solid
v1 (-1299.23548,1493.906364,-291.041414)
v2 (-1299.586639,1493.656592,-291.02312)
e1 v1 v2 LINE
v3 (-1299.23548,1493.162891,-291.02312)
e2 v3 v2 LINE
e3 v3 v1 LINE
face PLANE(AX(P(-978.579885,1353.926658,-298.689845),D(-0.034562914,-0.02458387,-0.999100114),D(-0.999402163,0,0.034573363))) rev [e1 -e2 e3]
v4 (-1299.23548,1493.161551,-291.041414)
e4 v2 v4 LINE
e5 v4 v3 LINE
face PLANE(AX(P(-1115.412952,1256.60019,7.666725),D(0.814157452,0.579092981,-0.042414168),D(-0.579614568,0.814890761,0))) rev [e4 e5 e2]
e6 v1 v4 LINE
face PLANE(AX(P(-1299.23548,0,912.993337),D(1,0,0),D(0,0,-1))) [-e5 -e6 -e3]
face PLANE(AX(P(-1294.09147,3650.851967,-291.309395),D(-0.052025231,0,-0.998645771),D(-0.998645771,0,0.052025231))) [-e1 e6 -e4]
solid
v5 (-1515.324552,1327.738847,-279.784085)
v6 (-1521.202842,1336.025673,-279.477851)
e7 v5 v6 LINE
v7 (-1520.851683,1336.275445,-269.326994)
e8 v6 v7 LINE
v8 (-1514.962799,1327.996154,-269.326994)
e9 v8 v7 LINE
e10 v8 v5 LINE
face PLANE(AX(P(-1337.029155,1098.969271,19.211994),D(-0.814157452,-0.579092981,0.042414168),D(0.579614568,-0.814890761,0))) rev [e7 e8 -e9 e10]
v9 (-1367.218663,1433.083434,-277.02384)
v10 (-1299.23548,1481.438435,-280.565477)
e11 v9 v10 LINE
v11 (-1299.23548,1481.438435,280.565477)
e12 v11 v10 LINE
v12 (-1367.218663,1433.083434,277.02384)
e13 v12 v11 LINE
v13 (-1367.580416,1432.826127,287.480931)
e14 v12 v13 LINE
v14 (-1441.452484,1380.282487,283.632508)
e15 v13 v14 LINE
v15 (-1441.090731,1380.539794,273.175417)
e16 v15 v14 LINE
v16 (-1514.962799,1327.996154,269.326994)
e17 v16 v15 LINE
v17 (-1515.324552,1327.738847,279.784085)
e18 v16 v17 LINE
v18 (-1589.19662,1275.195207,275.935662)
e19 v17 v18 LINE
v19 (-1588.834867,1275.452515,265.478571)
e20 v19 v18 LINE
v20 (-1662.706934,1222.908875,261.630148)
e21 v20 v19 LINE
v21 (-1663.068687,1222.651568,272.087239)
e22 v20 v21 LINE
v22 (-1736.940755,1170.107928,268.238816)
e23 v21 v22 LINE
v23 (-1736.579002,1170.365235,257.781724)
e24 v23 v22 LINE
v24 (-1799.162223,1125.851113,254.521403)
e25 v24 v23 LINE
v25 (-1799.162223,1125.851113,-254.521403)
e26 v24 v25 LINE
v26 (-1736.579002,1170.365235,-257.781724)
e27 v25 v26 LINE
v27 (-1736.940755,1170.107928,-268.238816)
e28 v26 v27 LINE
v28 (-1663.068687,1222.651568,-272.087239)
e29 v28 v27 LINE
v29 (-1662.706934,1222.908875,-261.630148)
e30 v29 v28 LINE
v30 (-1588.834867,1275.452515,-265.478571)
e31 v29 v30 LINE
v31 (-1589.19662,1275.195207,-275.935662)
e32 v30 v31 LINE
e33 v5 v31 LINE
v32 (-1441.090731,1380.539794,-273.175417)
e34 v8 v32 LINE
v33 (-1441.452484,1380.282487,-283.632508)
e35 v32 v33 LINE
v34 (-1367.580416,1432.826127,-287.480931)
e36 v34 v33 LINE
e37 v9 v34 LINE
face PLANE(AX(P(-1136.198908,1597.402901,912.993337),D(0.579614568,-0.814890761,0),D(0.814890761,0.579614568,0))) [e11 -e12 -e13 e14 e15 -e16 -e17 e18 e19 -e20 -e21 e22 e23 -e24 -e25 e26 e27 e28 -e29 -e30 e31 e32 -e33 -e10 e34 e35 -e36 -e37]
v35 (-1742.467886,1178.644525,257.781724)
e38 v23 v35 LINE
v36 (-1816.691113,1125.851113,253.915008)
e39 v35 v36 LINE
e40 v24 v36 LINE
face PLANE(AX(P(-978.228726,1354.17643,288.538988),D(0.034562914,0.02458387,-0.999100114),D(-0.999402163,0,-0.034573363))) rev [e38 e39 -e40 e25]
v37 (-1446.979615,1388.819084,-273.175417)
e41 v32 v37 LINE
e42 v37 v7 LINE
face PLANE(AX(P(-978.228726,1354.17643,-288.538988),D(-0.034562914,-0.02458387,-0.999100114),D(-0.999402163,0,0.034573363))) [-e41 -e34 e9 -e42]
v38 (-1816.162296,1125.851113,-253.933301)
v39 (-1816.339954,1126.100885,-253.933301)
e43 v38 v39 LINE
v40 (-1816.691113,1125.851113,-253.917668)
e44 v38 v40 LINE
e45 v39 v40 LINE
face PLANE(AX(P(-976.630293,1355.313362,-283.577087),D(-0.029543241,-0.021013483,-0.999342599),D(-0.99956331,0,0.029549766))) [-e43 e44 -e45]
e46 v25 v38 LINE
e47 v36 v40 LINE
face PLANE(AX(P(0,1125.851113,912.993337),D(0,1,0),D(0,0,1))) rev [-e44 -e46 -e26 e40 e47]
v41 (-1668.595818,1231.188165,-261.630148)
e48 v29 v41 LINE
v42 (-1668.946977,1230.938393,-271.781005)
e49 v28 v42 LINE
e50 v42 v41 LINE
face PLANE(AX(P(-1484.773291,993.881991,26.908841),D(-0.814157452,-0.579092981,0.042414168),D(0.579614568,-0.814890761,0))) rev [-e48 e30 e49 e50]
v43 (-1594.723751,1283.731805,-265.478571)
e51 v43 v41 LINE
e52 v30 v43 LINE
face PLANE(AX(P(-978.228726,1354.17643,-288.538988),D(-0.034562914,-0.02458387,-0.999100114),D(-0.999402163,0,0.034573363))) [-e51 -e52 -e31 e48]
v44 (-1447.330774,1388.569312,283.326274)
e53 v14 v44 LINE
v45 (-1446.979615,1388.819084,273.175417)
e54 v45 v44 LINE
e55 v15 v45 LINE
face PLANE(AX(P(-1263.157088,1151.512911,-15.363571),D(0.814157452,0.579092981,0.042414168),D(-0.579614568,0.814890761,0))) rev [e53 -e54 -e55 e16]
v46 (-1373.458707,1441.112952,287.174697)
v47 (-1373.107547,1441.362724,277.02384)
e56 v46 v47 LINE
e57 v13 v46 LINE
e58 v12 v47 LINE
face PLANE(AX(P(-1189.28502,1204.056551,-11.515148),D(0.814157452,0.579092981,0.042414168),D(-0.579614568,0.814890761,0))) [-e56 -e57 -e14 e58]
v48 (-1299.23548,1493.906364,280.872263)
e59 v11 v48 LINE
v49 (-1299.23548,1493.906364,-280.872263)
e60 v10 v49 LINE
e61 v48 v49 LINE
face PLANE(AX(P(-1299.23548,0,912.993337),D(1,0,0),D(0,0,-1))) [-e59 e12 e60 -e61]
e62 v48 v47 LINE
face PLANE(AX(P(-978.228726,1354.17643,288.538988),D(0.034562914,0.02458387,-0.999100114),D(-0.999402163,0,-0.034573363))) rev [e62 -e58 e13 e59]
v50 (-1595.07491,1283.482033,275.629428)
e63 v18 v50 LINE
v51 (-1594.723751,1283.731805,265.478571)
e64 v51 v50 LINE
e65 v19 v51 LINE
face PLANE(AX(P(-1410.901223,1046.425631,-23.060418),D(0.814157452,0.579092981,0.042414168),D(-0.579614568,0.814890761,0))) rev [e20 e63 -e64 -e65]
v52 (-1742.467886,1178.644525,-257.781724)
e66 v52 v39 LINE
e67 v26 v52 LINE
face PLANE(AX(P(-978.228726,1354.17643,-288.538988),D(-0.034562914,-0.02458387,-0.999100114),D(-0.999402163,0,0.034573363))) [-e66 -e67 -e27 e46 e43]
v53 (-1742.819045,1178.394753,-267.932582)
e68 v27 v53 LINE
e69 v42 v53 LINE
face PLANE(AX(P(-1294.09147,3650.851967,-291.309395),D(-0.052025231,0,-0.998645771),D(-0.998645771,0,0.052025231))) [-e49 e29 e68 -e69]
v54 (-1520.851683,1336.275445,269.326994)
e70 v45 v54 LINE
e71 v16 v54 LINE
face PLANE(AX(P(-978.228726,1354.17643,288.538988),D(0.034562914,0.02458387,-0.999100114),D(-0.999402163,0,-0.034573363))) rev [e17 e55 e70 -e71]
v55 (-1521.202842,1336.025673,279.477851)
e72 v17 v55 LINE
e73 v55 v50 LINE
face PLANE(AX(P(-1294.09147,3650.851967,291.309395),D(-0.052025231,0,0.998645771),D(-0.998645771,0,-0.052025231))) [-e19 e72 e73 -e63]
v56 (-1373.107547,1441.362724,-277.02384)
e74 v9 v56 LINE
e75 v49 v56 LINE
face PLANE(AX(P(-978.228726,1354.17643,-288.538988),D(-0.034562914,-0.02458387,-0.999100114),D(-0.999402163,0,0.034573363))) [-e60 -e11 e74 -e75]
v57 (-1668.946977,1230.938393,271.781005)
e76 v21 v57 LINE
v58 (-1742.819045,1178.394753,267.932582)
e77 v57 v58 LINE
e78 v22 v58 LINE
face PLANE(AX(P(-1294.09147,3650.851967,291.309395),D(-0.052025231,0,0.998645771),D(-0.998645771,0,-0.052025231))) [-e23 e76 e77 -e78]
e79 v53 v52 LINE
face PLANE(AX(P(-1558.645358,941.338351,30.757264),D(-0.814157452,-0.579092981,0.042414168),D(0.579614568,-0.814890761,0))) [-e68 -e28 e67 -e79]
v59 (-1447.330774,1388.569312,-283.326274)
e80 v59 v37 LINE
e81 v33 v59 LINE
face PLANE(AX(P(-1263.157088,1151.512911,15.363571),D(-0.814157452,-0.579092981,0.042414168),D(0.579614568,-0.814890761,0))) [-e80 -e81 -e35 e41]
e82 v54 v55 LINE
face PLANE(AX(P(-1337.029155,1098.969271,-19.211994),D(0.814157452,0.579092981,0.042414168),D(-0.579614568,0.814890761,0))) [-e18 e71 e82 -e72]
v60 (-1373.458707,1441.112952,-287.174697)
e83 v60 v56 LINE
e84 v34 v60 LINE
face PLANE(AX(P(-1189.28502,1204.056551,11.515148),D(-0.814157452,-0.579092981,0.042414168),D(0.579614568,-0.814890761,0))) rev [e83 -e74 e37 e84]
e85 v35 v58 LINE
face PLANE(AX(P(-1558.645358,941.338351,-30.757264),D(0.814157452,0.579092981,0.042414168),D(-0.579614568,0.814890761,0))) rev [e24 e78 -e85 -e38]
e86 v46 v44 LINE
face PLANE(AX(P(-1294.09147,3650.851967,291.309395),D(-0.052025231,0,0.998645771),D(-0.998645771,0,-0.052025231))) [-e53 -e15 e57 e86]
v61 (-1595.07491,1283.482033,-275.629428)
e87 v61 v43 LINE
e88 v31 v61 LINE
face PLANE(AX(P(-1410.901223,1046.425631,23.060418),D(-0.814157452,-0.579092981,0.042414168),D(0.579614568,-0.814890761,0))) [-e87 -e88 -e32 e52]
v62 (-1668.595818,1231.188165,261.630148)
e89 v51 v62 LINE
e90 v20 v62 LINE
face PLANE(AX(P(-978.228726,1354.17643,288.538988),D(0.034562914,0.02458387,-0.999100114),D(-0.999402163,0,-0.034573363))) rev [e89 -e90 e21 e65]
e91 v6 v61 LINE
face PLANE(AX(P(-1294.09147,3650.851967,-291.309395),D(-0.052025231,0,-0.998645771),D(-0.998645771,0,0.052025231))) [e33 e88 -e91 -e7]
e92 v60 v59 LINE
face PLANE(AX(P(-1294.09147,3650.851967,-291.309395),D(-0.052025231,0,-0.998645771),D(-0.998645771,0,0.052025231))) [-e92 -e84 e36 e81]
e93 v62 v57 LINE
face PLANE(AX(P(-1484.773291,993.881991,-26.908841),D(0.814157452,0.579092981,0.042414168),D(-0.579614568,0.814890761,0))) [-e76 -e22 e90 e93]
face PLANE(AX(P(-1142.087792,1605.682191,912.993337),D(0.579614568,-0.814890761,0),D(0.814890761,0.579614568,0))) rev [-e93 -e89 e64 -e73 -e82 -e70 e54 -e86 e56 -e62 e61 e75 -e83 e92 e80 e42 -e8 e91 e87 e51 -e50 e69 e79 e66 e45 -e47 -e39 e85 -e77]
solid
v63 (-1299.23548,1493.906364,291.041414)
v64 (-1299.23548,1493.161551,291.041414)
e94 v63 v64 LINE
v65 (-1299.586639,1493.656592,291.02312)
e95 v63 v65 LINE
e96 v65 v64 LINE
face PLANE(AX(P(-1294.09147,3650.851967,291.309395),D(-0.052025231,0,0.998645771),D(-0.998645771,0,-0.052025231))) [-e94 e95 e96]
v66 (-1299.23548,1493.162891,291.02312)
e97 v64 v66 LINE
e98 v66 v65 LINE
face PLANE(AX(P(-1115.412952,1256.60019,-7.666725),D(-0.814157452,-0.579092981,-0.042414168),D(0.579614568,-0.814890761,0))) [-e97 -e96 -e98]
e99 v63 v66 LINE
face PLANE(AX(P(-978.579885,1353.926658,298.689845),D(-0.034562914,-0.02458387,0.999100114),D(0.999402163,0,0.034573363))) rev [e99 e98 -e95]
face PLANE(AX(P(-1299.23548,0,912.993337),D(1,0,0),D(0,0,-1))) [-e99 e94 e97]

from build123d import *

# Parameters (mm, degrees)
CUT_EXTRUDE1_DEPTH = 878.515019104


with BuildPart() as part:
    # Boss-Extrude1: read off the stored shape, not the designer's step
    # Boss-Extrude1: loft between two sections, ruled curve by curve
    boss_extrude1_from = [
        Edge.make_line((-1299.235479685, 1493.906364056, 291.041413739), (-1816.691112906, 1125.851113248, 264.08415862)),
        Edge.make_line((-1816.691112906, 1125.851113248, 264.08415862), (-1816.691112906, 1125.851113248, -264.08415862)),
        Edge.make_line((-1299.235479685, 1493.906364056, 291.041413739), (-1299.235479685, 1493.906364056, -291.041413739)),
        Edge.make_line((-1299.235479685, 1493.906364056, -291.041413739), (-1816.691112906, 1125.851113248, -264.08415862)),
    ]
    boss_extrude1_to = [
        Edge.make_line((-1299.235479685, 1481.438435241, 291.041413739), (-1799.16222292, 1125.851113248, 264.997339826)),
        Edge.make_line((-1799.16222292, 1125.851113248, 264.997339826), (-1799.16222292, 1125.851113248, -264.997339826)),
        Edge.make_line((-1299.235479685, 1481.438435241, 291.041413739), (-1299.235479685, 1481.438435241, -291.041413739)),
        Edge.make_line((-1299.235479685, 1481.438435241, -291.041413739), (-1799.16222292, 1125.851113248, -264.997339826)),
    ]
    boss_extrude1 = Solid(Shell([*[Face.make_surface_from_curves(boss_extrude1_from[k], boss_extrude1_to[k]) for k in range(4)], Face(Wire(boss_extrude1_from)), Face(Wire(boss_extrude1_to))]))
    add(boss_extrude1)

    # Sketch2 → Cut-Extrude1 (cut, through all)
    with BuildSketch(Plane(origin=(-1142.087792172, 1605.682191448, 0), x_dir=(0.81489076097809, 0.5796145682024818, 0), z_dir=(-0.5796145682024818, 0.81489076097809, 0))):
        Polygon((-827.845096593, -264.08415862), (-827.414168646, -253.933301459), (-827.845096593, -253.915007546), align=None)
        Polygon((-737.192372014, -267.932581649), (-736.761444067, -257.781724488), (-827.414168646, -253.933301459), (-827.845096593, -264.08415862), align=None)
        Polygon((-555.886922855, -275.629427708), (-555.455994909, -265.478570547), (-646.108719488, -261.630147518), (-646.539647434, -271.781004679), align=None)
        Polygon((-374.581473697, -283.326273767), (-374.150545751, -273.175416606), (-464.80327033, -269.326993577), (-465.234198276, -279.477850738), align=None)
        Polygon((-193.276024539, -291.023119826), (-192.845096593, -280.872262665), (-283.497821172, -277.023839636), (-283.928749118, -287.174696797), align=None)
        Polygon((-192.845096593, -291.041413739), (-192.845096593, -280.872262665), (-193.276024539, -291.023119826), align=None)
        Polygon((-192.845096593, 280.872262665), (-193.276024539, 291.023119826), (-283.928749118, 287.174696797), (-283.497821172, 277.023839636), align=None)
        Polygon((-192.845096593, 280.872262665), (-192.845096593, 291.041413739), (-193.276024539, 291.023119826), align=None)
        Polygon((-374.150545751, 273.175416606), (-374.581473697, 283.326273767), (-465.234198276, 279.477850738), (-464.80327033, 269.326993577), align=None)
        Polygon((-555.455994909, 265.478570547), (-555.886922855, 275.629427708), (-646.539647434, 271.781004679), (-646.108719488, 261.630147518), align=None)
        Polygon((-736.761444067, 257.781724488), (-737.192372014, 267.932581649), (-827.845096593, 264.08415862), (-827.414168646, 253.933301459), align=None)
        Polygon((-827.414168646, 253.933301459), (-827.845096593, 264.08415862), (-827.845096593, 253.917668219), align=None)
        Polygon((-556.826174341, -297.75425795), (-555.886922855, -275.629427708), (-646.539647434, -271.781004679), (-647.47889892, -293.90583492), align=None)
        Polygon((-375.262063911, -299.358128032), (-374.581473697, -283.326273767), (-465.234198276, -279.477850738), (-465.91478849, -295.509705003), align=None)
        Polygon((-194.006069754, -308.219926744), (-193.276024539, -291.023119826), (-283.928749118, -287.174696797), (-284.658794333, -304.371503715), align=None)
        Polygon((-738.000757054, -286.974746688), (-737.192372014, -267.932581649), (-827.845096593, -264.08415862), (-828.653481633, -283.126323658), align=None)
        Polygon((-827.845096593, 264.08415862), (-737.192372014, 267.932581649), (-737.748395542, 281.030166657), (-828.401120121, 277.181743628), align=None)
        Polygon((-646.539647434, 271.781004679), (-555.886922855, 275.629427708), (-556.663676724, 293.926494848), (-647.316401303, 290.078071818), align=None)
        Polygon((-465.234198276, 279.477850738), (-374.581473697, 283.326273767), (-375.05432859, 294.464754124), (-465.707053169, 290.616331094), align=None)
        Polygon((-283.928749118, 287.174696797), (-193.276024539, 291.023119826), (-193.742299233, 302.006598264), (-284.395023812, 298.158175235), align=None)
    extrude(amount=-CUT_EXTRUDE1_DEPTH, mode=Mode.SUBTRACT)


with BuildPart() as cut_extrude1_piece_1:
    # of the separate pieces the step leaves, piece 1, a body of its own (cut_extrude1_pieces)
    add(part.part.solids().sort_by_distance((-1373.458706604, 1441.112952127, 287.174696797))[0])


with BuildPart() as cut_extrude1_piece_2:
    # of the separate pieces the step leaves, piece 2, a body of its own (cut_extrude1_pieces)
    add(part.part.solids().sort_by_distance((-1299.235479685, 1493.906364056, 291.041413739))[0])


with BuildPart() as cut_extrude1_piece_3:
    # of the separate pieces the step leaves, piece 3, a body of its own (cut_extrude1_pieces)
    add(part.part.solids().sort_by_distance((-1299.235479685, 1493.906364056, -291.041413739))[0])


solid = Compound([cut_extrude1_piece_1.part, cut_extrude1_piece_2.part, cut_extrude1_piece_3.part])
